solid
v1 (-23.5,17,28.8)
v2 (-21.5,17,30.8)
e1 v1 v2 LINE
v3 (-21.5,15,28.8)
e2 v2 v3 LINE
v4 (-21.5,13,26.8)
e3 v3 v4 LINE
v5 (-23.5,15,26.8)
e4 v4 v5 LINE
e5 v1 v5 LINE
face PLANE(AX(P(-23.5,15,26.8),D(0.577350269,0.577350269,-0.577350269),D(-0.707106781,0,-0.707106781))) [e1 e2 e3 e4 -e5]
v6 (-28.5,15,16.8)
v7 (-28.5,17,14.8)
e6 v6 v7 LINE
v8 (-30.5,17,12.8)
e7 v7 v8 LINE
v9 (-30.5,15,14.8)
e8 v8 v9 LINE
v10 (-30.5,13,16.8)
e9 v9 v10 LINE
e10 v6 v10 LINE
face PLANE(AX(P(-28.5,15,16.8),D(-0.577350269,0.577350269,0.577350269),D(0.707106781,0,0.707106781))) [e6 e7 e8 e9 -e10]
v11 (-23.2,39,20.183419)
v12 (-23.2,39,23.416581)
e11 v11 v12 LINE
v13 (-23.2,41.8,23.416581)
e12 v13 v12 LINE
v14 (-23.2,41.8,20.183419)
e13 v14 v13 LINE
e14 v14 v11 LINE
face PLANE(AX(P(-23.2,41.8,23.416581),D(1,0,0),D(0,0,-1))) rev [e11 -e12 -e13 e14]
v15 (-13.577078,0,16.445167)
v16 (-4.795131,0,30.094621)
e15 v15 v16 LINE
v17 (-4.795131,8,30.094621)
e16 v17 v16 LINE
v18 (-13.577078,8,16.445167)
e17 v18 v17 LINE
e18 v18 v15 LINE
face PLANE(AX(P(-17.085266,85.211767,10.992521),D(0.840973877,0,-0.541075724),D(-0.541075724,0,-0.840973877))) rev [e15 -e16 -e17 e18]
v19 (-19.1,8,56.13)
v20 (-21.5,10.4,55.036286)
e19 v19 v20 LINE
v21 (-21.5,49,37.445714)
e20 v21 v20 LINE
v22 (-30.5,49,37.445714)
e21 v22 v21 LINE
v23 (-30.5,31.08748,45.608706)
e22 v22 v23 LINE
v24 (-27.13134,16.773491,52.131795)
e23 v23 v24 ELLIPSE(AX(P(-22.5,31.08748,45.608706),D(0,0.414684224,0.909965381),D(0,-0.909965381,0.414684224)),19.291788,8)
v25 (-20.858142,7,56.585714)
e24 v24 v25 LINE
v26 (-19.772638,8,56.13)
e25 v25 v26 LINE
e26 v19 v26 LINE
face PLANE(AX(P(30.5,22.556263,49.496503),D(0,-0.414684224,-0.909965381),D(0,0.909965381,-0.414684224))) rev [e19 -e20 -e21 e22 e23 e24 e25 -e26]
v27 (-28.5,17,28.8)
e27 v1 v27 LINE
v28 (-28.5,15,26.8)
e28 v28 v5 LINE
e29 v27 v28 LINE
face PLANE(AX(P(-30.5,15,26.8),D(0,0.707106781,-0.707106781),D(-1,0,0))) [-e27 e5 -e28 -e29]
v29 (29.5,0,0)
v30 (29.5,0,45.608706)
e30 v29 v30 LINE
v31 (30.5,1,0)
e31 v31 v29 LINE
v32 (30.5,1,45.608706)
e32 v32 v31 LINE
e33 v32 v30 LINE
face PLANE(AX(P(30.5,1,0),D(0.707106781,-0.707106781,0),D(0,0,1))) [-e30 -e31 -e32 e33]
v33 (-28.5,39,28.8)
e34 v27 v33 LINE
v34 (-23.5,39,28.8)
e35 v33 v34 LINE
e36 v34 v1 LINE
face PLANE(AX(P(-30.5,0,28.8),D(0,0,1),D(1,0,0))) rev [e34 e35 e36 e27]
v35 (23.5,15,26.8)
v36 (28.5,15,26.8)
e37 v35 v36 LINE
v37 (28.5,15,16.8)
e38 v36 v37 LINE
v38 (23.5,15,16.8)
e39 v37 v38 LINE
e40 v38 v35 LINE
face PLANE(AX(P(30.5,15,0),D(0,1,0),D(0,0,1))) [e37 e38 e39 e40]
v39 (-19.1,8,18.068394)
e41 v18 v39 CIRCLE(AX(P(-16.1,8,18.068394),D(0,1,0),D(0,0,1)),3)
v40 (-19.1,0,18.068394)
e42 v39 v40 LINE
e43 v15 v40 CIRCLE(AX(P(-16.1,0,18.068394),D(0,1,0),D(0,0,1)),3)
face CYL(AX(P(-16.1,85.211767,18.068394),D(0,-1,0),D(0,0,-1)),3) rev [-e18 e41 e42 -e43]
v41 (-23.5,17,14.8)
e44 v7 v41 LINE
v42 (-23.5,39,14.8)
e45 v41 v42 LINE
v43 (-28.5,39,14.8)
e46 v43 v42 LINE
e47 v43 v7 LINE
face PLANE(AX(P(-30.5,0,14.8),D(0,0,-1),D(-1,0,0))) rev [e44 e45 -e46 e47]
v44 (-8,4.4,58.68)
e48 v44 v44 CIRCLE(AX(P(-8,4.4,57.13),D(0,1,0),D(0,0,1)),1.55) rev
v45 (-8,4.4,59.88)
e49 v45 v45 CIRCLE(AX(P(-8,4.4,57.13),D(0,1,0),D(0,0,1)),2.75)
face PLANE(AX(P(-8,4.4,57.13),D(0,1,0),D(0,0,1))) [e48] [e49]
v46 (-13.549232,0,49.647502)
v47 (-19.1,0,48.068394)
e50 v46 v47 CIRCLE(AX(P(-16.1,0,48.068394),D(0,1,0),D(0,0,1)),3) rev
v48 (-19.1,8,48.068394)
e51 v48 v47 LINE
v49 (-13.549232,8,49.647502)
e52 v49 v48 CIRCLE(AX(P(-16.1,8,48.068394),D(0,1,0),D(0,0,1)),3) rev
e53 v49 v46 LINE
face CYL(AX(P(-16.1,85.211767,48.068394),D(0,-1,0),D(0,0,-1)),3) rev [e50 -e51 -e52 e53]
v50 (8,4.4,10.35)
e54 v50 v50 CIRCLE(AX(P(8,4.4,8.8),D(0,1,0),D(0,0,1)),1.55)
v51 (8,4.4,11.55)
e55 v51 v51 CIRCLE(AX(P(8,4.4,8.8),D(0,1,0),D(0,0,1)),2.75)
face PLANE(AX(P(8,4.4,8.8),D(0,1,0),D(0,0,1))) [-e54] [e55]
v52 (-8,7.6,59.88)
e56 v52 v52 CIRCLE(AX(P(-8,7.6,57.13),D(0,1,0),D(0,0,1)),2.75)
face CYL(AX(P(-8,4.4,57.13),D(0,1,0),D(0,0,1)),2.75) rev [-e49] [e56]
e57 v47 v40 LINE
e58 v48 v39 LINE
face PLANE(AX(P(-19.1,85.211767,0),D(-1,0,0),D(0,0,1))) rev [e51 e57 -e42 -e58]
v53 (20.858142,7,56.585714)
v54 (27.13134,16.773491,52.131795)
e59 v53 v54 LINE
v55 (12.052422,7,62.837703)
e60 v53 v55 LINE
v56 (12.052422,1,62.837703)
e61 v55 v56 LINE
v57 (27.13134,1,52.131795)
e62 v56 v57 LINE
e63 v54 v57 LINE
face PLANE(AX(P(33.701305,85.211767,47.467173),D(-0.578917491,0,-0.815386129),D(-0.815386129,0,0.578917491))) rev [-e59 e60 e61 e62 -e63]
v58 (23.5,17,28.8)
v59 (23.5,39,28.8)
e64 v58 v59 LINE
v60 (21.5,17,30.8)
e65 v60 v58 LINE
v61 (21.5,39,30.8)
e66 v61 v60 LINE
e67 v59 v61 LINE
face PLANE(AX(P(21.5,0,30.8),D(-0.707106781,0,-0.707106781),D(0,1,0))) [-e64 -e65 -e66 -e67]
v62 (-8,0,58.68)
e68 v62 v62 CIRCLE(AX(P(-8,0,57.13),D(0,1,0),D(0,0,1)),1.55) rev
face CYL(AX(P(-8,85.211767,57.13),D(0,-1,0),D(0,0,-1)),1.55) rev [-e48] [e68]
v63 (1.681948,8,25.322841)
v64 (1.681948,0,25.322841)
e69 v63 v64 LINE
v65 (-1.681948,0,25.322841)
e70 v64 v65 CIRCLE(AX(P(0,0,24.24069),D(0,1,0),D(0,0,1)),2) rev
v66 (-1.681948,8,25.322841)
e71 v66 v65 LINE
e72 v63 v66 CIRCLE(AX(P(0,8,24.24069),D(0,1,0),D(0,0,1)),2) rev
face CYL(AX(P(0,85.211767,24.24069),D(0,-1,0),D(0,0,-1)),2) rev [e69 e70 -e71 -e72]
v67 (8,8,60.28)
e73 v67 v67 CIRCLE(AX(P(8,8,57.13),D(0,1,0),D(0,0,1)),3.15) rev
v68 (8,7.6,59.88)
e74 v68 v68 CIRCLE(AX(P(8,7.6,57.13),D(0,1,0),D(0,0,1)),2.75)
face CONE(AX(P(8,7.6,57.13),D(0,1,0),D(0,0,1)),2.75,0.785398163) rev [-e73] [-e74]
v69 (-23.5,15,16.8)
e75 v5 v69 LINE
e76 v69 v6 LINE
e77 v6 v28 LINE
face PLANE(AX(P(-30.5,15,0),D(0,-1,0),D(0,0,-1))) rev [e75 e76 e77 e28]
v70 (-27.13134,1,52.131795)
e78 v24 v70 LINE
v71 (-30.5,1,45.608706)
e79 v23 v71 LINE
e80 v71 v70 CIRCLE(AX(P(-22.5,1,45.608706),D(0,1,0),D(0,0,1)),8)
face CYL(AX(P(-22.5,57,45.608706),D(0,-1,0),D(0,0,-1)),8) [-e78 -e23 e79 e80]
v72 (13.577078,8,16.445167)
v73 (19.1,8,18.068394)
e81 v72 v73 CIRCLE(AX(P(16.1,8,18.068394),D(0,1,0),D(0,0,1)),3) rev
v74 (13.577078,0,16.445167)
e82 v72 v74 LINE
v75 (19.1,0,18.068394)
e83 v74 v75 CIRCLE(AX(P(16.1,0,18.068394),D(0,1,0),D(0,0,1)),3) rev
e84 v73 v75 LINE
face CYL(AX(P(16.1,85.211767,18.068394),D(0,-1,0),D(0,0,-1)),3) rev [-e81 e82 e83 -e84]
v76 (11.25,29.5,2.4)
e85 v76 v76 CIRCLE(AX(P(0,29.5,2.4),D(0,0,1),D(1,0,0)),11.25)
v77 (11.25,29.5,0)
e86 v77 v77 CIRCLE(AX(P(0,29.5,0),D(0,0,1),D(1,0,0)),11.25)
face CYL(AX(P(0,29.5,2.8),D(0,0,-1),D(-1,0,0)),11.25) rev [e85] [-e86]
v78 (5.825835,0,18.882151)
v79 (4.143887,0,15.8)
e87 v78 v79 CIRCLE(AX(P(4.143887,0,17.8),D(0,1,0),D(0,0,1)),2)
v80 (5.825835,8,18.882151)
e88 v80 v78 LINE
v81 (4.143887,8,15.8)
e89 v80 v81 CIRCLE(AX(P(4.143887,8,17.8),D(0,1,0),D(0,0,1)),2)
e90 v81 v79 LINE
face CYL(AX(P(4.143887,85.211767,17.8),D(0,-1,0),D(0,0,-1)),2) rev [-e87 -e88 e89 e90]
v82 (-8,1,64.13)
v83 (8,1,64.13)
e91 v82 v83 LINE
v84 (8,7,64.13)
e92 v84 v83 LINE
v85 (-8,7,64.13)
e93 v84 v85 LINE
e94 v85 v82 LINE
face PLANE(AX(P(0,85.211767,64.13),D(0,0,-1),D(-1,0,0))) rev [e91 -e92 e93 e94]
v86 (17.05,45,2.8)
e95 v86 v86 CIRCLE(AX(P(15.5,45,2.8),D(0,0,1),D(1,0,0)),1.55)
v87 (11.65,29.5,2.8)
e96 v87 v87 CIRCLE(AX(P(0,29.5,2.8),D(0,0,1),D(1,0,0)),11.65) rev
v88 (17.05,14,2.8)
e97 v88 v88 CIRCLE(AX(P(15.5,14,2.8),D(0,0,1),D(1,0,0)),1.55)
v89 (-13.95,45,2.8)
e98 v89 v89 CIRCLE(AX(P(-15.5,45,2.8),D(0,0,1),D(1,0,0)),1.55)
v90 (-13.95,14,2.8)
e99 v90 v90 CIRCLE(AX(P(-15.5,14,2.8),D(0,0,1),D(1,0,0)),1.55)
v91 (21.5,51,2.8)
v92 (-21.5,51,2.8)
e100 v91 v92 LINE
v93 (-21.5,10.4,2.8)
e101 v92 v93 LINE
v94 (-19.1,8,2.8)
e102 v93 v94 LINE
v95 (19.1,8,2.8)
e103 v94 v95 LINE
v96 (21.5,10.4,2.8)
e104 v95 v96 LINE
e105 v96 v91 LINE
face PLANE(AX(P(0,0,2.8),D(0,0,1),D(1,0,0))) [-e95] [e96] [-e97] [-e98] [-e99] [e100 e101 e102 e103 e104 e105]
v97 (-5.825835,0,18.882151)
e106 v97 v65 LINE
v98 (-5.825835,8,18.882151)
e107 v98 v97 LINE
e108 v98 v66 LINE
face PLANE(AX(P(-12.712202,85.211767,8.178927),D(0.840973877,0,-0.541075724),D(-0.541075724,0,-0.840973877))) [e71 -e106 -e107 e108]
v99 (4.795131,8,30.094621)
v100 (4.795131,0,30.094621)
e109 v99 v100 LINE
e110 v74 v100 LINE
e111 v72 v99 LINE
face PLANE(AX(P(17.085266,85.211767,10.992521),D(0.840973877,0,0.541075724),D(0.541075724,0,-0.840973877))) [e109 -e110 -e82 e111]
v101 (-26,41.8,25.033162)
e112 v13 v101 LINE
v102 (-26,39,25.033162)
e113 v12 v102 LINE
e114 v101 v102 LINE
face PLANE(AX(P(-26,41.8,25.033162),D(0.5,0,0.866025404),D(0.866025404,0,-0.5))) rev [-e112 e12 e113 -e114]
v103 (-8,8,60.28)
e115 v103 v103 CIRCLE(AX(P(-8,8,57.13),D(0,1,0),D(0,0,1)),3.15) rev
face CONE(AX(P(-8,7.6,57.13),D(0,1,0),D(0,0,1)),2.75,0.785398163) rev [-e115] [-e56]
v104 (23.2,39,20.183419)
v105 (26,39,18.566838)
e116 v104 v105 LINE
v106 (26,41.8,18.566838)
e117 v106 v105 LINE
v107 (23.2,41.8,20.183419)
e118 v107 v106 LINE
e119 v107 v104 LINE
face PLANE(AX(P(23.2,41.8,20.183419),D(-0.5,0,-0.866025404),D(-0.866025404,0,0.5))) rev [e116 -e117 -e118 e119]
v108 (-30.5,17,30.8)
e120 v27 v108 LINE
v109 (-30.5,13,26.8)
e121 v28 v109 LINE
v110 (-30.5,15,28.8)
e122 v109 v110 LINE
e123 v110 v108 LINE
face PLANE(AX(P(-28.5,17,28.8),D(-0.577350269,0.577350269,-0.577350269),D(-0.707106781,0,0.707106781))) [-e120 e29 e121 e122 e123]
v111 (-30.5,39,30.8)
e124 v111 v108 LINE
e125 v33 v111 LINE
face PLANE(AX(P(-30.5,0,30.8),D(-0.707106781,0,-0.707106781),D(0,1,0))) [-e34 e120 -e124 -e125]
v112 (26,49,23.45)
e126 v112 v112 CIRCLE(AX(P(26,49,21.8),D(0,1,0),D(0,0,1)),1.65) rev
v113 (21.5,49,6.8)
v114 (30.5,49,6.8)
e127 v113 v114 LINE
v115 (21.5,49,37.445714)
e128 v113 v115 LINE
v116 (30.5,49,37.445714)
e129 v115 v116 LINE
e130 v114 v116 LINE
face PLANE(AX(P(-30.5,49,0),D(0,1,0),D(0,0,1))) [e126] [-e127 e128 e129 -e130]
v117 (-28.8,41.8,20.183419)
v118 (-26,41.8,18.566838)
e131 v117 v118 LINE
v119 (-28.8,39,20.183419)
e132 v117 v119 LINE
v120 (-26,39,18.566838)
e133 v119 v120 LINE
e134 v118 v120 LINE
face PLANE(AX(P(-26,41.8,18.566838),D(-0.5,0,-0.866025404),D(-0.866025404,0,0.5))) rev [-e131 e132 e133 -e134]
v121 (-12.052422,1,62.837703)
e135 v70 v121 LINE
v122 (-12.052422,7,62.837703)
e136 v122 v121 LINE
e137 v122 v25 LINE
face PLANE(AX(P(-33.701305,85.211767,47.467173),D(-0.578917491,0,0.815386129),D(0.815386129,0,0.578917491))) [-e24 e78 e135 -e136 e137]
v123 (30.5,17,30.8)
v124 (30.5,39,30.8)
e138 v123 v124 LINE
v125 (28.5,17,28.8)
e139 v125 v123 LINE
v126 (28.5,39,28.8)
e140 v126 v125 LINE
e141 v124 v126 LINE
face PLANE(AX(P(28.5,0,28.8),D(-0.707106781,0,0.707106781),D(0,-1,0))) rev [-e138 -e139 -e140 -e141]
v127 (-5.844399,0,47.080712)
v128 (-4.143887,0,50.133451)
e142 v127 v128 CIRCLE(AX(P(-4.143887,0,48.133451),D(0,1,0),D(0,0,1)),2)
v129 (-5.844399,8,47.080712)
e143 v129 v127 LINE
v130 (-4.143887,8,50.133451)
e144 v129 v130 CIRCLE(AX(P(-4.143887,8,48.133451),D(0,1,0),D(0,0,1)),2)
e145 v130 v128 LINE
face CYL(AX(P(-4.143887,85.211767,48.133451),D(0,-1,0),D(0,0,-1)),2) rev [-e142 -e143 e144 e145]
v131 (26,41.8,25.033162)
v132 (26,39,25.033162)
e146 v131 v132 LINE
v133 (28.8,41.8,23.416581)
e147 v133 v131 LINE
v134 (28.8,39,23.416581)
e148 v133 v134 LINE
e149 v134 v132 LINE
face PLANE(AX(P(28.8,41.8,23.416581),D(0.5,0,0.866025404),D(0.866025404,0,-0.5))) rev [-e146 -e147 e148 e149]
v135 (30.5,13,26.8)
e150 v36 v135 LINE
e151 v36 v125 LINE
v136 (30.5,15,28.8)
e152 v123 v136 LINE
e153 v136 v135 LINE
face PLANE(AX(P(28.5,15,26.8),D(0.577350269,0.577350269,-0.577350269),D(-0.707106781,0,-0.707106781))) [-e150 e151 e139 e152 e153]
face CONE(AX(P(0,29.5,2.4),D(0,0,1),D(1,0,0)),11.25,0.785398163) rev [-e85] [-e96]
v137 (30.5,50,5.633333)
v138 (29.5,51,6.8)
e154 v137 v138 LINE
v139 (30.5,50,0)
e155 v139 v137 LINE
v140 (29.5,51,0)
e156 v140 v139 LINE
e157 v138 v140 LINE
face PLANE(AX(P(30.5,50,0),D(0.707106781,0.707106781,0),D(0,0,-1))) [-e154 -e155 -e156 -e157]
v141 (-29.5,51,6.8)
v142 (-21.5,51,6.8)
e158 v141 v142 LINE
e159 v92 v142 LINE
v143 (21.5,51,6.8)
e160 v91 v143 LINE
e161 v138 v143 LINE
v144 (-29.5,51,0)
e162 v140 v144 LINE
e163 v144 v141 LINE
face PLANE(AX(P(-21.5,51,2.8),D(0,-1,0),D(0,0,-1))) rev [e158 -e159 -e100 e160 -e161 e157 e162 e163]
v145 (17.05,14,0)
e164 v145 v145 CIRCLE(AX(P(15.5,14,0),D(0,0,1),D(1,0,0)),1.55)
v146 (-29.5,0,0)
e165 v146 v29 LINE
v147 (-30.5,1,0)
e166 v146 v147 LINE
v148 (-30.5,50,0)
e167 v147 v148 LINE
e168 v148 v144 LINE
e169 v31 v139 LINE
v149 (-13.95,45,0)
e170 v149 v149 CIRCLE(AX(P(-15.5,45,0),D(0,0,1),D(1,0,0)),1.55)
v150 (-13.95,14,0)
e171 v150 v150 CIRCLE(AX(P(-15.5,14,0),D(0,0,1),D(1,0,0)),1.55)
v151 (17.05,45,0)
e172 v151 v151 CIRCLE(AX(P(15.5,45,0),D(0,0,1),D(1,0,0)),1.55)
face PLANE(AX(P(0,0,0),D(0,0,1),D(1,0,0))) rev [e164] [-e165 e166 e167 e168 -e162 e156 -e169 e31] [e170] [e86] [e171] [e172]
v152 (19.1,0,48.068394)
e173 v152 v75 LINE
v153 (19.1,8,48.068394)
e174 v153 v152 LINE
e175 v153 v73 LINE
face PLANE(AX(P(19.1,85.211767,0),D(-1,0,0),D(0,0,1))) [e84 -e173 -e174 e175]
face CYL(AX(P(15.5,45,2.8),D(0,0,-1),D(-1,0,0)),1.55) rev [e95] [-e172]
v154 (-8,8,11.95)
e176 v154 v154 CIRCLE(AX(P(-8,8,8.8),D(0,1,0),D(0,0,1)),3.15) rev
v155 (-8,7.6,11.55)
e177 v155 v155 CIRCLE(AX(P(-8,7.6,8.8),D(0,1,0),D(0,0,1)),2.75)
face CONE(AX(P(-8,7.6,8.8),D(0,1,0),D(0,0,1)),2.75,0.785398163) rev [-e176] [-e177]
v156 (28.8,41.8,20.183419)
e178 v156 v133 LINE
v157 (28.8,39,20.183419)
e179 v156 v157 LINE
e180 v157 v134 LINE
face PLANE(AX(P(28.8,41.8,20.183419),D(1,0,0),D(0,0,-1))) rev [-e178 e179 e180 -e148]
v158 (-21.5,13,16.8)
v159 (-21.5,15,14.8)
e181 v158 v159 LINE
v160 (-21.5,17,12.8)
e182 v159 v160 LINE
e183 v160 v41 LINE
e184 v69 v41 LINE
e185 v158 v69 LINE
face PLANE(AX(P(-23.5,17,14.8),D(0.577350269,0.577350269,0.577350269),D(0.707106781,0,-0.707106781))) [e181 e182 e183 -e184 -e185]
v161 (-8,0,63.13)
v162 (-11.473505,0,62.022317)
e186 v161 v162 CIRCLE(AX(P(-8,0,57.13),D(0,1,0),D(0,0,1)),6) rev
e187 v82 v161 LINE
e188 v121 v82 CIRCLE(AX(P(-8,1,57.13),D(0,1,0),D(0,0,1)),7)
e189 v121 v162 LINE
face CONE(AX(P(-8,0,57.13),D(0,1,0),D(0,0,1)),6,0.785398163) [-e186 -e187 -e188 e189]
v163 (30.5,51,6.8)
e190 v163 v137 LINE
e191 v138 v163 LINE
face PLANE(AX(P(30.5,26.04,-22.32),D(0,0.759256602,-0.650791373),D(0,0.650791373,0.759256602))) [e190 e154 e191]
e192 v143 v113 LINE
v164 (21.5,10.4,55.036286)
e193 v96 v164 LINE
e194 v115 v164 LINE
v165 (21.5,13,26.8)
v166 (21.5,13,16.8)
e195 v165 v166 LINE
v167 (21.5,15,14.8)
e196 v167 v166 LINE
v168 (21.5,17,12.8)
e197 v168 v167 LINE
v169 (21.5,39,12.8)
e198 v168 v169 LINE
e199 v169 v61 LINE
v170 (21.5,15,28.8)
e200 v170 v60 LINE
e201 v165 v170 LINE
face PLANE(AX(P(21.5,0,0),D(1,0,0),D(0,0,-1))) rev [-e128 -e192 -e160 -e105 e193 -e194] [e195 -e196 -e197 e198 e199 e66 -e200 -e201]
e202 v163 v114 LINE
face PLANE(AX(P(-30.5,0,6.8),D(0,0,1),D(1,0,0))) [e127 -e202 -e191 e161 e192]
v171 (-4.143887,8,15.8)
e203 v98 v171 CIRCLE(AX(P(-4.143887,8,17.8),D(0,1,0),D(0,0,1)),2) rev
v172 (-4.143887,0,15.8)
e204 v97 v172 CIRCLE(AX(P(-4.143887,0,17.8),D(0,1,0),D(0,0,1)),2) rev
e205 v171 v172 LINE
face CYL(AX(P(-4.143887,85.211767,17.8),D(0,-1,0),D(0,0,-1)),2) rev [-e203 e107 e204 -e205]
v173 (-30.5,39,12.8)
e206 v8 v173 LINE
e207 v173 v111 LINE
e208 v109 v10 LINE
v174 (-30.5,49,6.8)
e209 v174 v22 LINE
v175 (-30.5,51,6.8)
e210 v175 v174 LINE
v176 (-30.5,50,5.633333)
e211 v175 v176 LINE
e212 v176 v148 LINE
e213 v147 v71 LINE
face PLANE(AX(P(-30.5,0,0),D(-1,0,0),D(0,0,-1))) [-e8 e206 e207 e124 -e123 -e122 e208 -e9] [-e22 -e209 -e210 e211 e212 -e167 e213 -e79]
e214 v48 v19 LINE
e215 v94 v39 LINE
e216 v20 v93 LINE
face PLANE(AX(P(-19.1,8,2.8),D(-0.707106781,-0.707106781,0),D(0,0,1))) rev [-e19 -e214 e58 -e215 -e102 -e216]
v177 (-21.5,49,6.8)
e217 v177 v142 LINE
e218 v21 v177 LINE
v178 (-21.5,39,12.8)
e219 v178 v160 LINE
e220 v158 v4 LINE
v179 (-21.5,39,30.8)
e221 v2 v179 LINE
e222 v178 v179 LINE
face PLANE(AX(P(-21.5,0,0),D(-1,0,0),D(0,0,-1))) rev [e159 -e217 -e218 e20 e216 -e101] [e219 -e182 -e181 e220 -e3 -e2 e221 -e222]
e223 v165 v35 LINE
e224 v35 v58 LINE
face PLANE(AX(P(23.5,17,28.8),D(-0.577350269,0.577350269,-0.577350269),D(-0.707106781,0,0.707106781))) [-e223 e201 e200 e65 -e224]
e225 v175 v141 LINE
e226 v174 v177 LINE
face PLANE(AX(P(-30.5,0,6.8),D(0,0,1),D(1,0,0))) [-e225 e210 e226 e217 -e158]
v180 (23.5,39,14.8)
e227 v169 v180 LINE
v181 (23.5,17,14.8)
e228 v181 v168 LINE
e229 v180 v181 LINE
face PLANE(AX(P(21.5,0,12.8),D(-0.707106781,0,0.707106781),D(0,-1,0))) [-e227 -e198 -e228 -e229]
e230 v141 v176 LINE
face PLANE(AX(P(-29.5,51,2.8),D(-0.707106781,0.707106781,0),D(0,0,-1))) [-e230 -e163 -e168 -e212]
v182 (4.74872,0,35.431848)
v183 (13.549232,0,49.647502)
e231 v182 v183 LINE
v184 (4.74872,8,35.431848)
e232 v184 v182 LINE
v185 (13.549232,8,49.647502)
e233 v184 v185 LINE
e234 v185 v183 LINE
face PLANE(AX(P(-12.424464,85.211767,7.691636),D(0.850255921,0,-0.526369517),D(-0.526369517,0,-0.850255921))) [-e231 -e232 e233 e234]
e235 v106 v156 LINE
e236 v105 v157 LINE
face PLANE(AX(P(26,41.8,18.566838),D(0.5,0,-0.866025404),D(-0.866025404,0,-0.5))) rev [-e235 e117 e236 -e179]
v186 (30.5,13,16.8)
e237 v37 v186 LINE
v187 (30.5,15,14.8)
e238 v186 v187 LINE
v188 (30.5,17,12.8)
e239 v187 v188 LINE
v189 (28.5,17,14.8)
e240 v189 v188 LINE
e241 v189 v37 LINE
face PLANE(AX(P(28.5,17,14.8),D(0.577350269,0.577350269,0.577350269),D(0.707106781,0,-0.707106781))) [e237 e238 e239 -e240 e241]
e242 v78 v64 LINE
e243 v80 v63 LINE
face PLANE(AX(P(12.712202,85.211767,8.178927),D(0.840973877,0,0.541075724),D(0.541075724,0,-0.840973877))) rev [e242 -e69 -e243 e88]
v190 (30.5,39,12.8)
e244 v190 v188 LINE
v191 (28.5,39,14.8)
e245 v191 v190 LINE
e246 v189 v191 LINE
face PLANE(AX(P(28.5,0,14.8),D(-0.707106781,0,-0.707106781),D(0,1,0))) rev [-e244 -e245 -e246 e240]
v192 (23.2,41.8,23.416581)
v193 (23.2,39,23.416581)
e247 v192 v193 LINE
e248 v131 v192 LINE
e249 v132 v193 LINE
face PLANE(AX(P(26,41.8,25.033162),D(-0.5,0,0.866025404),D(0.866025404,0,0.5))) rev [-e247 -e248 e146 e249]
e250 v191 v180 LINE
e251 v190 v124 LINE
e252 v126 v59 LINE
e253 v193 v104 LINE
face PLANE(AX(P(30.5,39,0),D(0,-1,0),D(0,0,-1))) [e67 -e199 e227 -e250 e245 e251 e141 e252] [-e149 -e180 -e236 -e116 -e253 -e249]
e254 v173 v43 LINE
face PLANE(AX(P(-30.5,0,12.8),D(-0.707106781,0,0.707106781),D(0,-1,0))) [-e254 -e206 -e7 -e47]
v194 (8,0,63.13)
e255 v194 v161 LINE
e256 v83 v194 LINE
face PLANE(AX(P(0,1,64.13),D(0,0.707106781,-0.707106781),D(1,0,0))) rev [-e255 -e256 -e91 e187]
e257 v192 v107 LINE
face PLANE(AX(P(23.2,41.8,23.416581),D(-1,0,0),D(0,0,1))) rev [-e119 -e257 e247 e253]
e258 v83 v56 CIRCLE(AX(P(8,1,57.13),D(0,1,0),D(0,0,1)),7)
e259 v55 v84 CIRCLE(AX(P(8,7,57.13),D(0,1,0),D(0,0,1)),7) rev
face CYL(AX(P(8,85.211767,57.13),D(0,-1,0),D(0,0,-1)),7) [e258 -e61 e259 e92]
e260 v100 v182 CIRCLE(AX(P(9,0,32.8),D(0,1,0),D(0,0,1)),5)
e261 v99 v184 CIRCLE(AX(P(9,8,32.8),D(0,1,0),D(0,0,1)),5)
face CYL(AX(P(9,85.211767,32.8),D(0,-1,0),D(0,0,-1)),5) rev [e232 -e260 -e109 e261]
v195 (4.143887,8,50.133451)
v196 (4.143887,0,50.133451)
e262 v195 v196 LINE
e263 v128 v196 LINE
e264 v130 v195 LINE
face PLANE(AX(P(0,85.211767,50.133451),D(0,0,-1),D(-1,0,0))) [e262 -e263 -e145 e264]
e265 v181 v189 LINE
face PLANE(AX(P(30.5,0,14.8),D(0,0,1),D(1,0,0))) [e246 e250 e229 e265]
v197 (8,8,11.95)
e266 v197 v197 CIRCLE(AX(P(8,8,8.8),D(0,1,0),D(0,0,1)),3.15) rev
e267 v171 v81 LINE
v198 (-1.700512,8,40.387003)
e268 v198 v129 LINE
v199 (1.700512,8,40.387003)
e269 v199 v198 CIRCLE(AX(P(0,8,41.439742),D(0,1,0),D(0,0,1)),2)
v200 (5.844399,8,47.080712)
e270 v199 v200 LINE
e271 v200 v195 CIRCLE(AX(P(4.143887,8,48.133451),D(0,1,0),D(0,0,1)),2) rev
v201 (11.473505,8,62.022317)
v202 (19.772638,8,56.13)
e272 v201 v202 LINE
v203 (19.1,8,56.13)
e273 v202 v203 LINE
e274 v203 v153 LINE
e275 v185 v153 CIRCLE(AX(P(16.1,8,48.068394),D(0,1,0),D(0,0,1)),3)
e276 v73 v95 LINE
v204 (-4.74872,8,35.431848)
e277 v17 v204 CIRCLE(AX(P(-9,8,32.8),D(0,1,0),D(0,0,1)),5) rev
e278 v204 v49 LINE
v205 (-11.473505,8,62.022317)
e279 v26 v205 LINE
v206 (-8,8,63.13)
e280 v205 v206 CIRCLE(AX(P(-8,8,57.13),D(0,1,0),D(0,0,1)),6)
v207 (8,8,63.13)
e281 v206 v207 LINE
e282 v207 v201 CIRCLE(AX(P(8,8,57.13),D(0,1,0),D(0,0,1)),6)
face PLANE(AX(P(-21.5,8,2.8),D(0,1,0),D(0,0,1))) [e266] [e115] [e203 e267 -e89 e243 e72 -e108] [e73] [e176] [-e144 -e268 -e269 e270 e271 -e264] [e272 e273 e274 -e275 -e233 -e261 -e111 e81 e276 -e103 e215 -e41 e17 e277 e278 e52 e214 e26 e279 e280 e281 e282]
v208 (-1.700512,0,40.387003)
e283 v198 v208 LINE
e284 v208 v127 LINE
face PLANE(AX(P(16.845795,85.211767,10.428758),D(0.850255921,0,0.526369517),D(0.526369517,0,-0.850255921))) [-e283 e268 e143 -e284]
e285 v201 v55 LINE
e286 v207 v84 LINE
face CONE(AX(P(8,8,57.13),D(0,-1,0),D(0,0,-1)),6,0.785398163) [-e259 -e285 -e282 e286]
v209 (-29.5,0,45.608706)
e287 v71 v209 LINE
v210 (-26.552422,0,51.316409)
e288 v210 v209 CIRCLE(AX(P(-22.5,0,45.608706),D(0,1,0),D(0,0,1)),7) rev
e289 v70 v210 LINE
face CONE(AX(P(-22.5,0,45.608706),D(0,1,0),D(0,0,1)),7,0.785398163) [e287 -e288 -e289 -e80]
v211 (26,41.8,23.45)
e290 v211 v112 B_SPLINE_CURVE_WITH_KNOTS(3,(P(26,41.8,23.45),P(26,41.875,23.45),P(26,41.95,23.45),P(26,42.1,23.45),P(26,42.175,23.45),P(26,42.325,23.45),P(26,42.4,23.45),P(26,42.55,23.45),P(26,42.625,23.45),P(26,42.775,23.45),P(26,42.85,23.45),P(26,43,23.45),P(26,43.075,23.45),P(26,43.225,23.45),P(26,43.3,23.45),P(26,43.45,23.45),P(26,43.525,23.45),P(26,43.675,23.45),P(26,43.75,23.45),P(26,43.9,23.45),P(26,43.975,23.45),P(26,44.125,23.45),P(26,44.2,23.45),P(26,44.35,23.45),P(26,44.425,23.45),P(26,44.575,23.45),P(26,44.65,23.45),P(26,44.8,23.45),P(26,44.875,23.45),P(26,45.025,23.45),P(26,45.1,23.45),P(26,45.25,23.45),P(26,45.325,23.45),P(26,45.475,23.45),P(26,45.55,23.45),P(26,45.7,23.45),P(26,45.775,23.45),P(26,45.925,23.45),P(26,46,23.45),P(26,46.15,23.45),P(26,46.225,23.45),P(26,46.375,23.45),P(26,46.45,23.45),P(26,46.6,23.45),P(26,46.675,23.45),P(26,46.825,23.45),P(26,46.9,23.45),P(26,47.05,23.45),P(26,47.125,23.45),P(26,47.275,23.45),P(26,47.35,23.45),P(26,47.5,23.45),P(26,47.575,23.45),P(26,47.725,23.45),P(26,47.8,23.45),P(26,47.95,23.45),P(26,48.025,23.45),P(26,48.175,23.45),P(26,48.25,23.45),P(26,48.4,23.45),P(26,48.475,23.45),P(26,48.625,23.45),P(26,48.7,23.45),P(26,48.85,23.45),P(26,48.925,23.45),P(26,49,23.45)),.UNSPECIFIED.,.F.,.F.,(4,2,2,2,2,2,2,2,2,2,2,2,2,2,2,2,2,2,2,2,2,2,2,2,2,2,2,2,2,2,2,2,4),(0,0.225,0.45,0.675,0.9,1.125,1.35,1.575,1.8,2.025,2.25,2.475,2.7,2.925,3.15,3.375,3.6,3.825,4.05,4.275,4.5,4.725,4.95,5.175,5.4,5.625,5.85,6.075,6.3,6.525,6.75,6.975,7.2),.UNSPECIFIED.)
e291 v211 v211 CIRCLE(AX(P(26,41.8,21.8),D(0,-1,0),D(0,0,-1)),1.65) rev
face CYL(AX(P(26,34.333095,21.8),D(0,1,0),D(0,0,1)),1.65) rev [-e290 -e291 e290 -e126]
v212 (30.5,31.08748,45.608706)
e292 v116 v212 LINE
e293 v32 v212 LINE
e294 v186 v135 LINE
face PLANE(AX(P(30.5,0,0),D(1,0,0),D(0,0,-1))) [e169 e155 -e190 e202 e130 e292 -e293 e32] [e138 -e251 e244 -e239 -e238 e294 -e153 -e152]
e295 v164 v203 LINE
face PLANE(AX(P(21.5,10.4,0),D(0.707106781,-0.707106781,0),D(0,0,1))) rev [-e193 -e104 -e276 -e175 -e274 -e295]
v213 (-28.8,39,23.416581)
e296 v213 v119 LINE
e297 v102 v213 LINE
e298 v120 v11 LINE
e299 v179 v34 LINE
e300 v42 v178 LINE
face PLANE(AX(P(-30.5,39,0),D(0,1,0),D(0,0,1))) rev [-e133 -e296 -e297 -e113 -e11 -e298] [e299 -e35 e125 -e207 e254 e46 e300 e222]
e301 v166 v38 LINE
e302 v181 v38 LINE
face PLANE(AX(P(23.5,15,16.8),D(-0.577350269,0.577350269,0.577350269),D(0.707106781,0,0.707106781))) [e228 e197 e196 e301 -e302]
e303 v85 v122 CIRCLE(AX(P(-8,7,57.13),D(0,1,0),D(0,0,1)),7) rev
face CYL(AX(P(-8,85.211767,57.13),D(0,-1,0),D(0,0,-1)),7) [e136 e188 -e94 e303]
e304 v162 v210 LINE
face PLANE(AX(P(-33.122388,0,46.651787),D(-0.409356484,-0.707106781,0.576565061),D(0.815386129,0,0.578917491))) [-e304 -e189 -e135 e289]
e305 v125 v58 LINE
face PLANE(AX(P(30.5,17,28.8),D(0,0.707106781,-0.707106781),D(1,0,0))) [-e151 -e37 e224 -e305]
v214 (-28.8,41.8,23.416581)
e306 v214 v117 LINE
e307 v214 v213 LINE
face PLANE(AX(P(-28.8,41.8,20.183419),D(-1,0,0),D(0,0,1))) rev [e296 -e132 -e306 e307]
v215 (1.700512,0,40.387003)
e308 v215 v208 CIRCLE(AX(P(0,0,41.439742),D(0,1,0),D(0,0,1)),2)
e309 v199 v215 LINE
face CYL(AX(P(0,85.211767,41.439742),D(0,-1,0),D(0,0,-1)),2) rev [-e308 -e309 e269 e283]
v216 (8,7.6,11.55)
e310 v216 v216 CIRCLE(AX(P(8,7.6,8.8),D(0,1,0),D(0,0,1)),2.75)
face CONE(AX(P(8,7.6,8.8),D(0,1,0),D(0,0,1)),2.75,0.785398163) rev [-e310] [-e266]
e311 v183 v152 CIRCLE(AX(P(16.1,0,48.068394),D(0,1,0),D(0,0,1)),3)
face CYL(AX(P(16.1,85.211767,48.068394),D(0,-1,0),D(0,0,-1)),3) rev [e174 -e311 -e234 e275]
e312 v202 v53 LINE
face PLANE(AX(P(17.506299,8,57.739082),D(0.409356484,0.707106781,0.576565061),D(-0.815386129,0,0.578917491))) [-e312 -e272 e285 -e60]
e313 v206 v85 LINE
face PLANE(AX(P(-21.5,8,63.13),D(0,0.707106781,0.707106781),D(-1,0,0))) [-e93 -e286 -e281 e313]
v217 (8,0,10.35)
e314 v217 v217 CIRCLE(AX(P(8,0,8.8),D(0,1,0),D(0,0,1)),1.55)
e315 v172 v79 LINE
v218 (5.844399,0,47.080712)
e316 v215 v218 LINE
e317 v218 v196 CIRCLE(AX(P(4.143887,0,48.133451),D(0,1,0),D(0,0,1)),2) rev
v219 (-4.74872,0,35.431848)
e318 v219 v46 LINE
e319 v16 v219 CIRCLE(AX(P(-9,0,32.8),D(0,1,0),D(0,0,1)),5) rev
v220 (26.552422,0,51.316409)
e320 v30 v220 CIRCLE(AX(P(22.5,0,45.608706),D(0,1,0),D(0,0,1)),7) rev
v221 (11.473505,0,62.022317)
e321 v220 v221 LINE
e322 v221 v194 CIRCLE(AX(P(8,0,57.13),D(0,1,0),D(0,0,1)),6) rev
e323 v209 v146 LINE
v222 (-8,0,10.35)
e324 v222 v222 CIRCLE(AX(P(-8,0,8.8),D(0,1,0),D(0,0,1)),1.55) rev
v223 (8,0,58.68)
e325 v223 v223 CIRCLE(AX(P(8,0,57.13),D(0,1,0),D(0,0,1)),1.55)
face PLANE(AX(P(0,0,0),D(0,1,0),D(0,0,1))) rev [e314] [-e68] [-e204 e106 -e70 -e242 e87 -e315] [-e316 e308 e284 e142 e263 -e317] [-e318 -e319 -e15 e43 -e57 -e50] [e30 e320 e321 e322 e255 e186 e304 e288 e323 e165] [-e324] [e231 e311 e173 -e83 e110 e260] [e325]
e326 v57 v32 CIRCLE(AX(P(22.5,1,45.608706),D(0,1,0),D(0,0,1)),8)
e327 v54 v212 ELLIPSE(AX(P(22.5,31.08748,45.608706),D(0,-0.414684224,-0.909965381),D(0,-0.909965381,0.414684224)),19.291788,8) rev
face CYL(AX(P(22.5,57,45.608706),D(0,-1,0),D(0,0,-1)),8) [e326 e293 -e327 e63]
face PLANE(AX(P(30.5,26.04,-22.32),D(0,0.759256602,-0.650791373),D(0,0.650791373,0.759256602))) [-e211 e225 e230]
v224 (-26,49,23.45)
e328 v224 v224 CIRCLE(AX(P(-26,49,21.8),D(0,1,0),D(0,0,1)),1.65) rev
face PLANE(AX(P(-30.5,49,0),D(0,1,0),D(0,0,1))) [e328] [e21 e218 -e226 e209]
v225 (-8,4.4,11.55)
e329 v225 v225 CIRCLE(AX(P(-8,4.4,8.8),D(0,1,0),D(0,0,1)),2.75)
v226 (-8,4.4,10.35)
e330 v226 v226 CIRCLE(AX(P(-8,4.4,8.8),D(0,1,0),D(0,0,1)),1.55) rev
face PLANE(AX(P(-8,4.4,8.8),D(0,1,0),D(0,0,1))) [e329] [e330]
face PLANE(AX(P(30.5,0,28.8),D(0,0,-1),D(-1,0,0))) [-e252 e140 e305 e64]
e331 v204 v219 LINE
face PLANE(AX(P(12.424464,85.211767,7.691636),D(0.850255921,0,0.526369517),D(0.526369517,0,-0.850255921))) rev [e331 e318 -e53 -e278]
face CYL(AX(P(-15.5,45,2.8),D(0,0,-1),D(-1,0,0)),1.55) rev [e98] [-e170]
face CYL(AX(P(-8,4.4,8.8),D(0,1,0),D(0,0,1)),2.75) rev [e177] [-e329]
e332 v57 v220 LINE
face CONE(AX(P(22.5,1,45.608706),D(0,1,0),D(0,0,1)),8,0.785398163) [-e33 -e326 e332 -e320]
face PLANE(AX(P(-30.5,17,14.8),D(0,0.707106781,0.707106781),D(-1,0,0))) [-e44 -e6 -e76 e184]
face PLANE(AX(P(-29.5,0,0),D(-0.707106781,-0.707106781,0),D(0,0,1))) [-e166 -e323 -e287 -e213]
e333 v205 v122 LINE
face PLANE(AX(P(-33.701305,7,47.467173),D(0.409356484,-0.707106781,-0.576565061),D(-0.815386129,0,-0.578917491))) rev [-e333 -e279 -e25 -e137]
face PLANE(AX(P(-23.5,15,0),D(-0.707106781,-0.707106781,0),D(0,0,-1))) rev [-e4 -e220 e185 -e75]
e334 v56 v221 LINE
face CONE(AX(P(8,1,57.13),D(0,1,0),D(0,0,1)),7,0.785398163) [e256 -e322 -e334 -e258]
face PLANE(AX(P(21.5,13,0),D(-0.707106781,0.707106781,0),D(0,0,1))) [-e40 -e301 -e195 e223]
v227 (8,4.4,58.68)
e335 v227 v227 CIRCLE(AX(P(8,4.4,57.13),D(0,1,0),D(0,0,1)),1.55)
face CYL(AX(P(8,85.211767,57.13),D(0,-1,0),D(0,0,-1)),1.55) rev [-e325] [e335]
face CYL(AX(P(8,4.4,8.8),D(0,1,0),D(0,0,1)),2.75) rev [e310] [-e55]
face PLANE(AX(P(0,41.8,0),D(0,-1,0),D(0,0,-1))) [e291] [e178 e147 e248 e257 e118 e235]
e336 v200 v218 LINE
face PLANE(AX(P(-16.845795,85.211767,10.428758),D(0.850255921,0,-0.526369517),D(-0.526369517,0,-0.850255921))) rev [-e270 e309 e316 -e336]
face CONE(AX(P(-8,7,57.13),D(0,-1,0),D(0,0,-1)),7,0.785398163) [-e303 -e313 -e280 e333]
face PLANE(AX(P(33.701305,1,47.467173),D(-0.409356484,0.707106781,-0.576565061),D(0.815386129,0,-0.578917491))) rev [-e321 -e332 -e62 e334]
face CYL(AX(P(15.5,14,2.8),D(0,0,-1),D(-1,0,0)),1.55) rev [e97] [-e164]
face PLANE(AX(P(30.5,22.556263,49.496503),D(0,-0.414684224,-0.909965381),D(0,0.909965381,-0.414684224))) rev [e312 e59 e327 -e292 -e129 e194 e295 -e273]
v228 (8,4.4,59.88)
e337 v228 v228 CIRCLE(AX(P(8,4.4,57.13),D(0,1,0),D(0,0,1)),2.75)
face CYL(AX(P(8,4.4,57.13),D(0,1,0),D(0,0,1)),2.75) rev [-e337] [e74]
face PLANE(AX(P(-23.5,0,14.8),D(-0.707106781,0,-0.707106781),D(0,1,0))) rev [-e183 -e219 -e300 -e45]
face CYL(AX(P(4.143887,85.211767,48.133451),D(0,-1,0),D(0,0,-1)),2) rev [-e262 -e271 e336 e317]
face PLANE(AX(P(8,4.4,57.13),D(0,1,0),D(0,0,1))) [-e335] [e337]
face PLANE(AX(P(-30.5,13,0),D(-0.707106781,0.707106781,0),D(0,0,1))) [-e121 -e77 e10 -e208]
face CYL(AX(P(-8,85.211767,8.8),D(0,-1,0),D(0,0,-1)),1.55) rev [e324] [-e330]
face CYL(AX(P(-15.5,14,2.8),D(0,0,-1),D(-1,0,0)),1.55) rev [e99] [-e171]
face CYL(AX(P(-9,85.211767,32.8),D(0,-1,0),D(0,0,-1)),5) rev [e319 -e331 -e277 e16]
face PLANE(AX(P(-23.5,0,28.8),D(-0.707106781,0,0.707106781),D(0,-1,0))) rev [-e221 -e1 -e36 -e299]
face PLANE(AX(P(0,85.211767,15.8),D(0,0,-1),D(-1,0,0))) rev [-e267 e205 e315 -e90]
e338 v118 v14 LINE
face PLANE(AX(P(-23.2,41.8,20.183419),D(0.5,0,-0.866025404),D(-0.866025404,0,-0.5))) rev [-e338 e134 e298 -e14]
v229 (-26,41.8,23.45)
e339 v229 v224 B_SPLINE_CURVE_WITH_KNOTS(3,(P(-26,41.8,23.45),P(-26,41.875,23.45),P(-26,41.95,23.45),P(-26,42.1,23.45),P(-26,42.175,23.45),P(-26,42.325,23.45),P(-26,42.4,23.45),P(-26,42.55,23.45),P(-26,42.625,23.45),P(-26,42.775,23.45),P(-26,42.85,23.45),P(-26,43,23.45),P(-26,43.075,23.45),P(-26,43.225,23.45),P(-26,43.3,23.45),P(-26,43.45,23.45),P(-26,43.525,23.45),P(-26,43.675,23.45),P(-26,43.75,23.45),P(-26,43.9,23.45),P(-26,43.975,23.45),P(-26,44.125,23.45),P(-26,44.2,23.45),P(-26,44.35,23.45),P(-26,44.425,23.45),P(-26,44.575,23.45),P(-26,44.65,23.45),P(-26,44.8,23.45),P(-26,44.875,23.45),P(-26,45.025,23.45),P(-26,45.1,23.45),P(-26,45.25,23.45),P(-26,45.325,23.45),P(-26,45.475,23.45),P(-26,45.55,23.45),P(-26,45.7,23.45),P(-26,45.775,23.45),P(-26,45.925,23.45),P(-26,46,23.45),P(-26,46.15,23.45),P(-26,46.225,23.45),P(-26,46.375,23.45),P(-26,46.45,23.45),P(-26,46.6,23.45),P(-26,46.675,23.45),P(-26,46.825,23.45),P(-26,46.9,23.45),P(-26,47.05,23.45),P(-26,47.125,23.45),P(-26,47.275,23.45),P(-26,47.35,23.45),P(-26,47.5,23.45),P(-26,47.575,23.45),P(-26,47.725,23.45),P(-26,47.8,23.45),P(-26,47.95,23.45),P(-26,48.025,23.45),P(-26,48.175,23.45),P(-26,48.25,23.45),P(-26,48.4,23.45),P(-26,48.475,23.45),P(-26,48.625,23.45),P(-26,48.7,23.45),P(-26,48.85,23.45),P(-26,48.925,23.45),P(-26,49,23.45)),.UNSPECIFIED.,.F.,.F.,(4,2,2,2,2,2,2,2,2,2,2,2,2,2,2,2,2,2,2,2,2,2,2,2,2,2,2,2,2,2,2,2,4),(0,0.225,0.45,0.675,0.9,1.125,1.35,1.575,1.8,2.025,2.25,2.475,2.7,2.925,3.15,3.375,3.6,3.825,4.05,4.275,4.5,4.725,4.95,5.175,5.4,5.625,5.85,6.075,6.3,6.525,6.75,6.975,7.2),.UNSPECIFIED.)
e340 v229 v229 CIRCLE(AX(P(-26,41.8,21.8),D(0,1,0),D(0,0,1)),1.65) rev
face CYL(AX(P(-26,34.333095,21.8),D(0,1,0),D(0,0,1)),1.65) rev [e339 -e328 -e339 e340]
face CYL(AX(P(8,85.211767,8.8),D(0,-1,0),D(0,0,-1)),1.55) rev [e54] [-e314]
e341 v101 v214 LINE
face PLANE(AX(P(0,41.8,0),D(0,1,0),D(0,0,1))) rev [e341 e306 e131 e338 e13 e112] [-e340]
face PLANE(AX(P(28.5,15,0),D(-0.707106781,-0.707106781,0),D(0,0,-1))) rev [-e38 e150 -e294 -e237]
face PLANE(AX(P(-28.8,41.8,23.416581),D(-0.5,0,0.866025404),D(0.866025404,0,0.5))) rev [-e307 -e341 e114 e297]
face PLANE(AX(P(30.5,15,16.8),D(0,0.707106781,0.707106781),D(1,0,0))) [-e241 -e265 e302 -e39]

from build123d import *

# Parameters (mm, degrees)
SKETCH1_W               = 42.99999999999999
SKETCH1_H               = 43.00000000000001
SKETCH1_R               = 11.250000000000002
SKETCH1_R_2             = 1.5500000000000034
SKETCH1_R_3             = 1.5500000000000018
SKETCH1_R_4             = 1.5499999999999992
SKETCH1_R_5             = 1.5500000000000012
BOSS_EXTRUDE1_DEPTH     = 2.8
SKETCH2_R               = 1.5499999999999992
SKETCH2_R_2             = 1.5500000000000005
SKETCH2_R_3             = 1.5500000000000034
SKETCH2_R_4             = 1.5500000000000018
BOSS_EXTRUDE2_DEPTH     = 8
SKETCH3_R               = 2.75
SKETCH3_R_2             = 2.749999999999998
SKETCH3_R_3             = 2.7500000000000044
SKETCH3_R_4             = 2.7500000000000036
CUT_EXTRUDE1_DEPTH      = 3.6
SKETCH4_W               = 13.999999999999996
SKETCH4_H               = 24
BOSS_EXTRUDE3_DEPTH     = 9
CUT_EXTRUDE3_DEPTH      = 92.05990830217213
CHAMFER1_SIZE           = 2.4
BOSS_EXTRUDE4_START     = -21.5
BOSS_EXTRUDE4_DEPTH     = 43
SKETCH5_R               = 1.6499999999999986
SKETCH5_R_2             = 1.6500000000000061
CUT_EXTRUDE2_DEPTH      = 18
CUT_EXTRUDE4_DEPTH      = 2.8
CHAMFER2_SIZE           = 1
CHAMFER3_SIZE           = 1
FILLET1_R               = 2
CHAMFER4_SIZE           = 2
CHAMFER5_SIZE           = 0.4
CHAMFER6_SIZE           = 0.4
CUT_EXTRUDE5_DEPTH      = 92.05990830217213
CUT_EXTRUDE5_DEPTH_BACK = 92.05990830217213


# Read off the part's stored shape, not the designer's step: Mirror1
with BuildPart() as part:
    # Sketch1 → Boss-Extrude1 (new body)
    with BuildSketch(Plane.XY):
        with Locations((0, 29.500000000000004)):
            Rectangle(SKETCH1_W, SKETCH1_H)
        with Locations((0, 29.5)):
            Circle(SKETCH1_R, mode=Mode.SUBTRACT)
        with Locations((-15.5, 45)):
            Circle(SKETCH1_R_2, mode=Mode.SUBTRACT)
        with Locations((15.5, 45)):
            Circle(SKETCH1_R_3, mode=Mode.SUBTRACT)
        with Locations((-15.5, 14.000000000000005)):
            Circle(SKETCH1_R_4, mode=Mode.SUBTRACT)
        with Locations((15.5, 14.000000000000005)):
            Circle(SKETCH1_R_5, mode=Mode.SUBTRACT)
    extrude(amount=BOSS_EXTRUDE1_DEPTH)

    # Sketch2 → Boss-Extrude2 (add)
    with BuildSketch(Plane(origin=(0, 0, 0), x_dir=(1, 0, 0), z_dir=(0, 1, 0))):
        with BuildLine():
            Line((-21.499999999999996, 0), (21.499999999999996, 0))
            Line((21.499999999999996, 0), (21.5, -56.13000000000001))
            Line((21.5, -56.13000000000001), (12.052422437019597, -62.83770289976113))
            ThreePointArc((12.052422437019597, -62.83770289976113), (10.126743955166411, -63.79910489864743), (8.000000000000245, -64.12999999999994))
            Line((8.000000000000245, -64.12999999999994), (-7.999999999999807, -64.13))
            ThreePointArc((-7.999999999999807, -64.13), (-10.126743955165974, -63.7991048986475), (-12.052422437019167, -62.83770289976122))
            Line((-12.052422437019167, -62.83770289976122), (-21.49999999999961, -56.13000000000015))
            Line((-21.49999999999961, -56.13000000000015), (-21.499999999999996, 0))
        make_face()
        with Locations(Location((8.00000000000003, -8.800000000000002, 0), (0, 0, 270))):
            Circle(SKETCH2_R, mode=Mode.SUBTRACT)
        with Locations(Location((-7.999999999999971, -8.800000000000054, 0), (0, 0, 270))):
            Circle(SKETCH2_R_2, mode=Mode.SUBTRACT)
        with Locations(Location((-7.999999999999804, -57.13000000000005, 0), (0, 0, 270))):
            Circle(SKETCH2_R_3, mode=Mode.SUBTRACT)
        with Locations(Location((8.000000000000195, -57.13, 0), (0, 0, 270))):
            Circle(SKETCH2_R_4, mode=Mode.SUBTRACT)
        with BuildLine():
            Line((13.57707837001736, -16.445166557918895), (4.795130616695724, -30.094621381516244))
            ThreePointArc((4.795130616695724, -30.094621381516244), (4.000189021604087, -32.75652379604577), (4.748720395176192, -35.43184758707804))
            Line((4.748720395176192, -35.43184758707804), (13.549232237105649, -49.64750228125598))
            ThreePointArc((13.549232237105649, -49.64750228125598), (16.92088266863083, -50.95390090181981), (19.099999999999994, -48.06839372900919))
            Line((19.099999999999994, -48.06839372900919), (19.099999999999994, -18.06839372900918))
            ThreePointArc((19.099999999999994, -18.06839372900918), (16.945941815390423, -15.190133413302142), (13.57707837001736, -16.445166557918895))
        make_face(mode=Mode.SUBTRACT)
        with BuildLine():
            Line((5.825834789666343, -18.882151447393497), (1.681947753321832, -25.32284097156898))
            ThreePointArc((1.681947753321832, -25.32284097156898), (8.95e-14, -26.24068952417545), (-1.6819477533216585, -25.32284097156899))
            Line((-1.6819477533216585, -25.32284097156899), (-5.825834789666213, -18.88215144739354))
            ThreePointArc((-5.825834789666213, -18.88215144739354), (-5.899492757283408, -16.84195587126352), (-4.14388703634448, -15.800000000000026))
            Line((-4.14388703634448, -15.800000000000026), (4.143887036344589, -15.799999999999999))
            ThreePointArc((4.143887036344589, -15.799999999999999), (5.899492757283525, -16.841955871263476), (5.825834789666343, -18.882151447393497))
        make_face(mode=Mode.SUBTRACT)
        with BuildLine():
            Line((1.7005118419297098, -40.38700274513657), (5.844398878274272, -47.080711958695154))
            ThreePointArc((5.844398878274272, -47.080711958695154), (5.891095963414161, -49.10672431853265), (4.143887036344701, -50.13345099352635))
            Line((4.143887036344701, -50.13345099352635), (-4.14388703634435, -50.13345099352636))
            ThreePointArc((-4.14388703634435, -50.13345099352636), (-5.891095963413801, -49.10672431853265), (-5.844398878273922, -47.08071195869517))
            Line((-5.844398878273922, -47.08071195869517), (-1.7005118419294287, -40.387002745136584))
            ThreePointArc((-1.7005118419294287, -40.387002745136584), (1.3517e-13, -39.43974177996776), (1.7005118419297098, -40.38700274513657))
        make_face(mode=Mode.SUBTRACT)
        with BuildLine():
            Line((-4.748720395175949, -35.431847587078074), (-13.54923223710531, -49.64750228125607))
            ThreePointArc((-13.54923223710531, -49.64750228125607), (-16.920882668630473, -50.953900901819914), (-19.099999999999664, -48.06839372900932))
            Line((-19.099999999999664, -48.06839372900932), (-19.09999999999987, -18.068393729009312))
            ThreePointArc((-19.09999999999987, -18.068393729009312), (-16.945941815390317, -15.190133413302267), (-13.577078370017249, -16.445166557918988))
            Line((-13.577078370017249, -16.445166557918988), (-4.795130616695517, -30.094621381516276))
            ThreePointArc((-4.795130616695517, -30.094621381516276), (-4.000189021603861, -32.7565237960458), (-4.748720395175949, -35.431847587078074))
        make_face(mode=Mode.SUBTRACT)
    extrude(amount=BOSS_EXTRUDE2_DEPTH)

    # Sketch3 → Cut-Extrude1 (cut)
    with BuildSketch(Plane(origin=(0, 8, 0), x_dir=(1, 0, 0), z_dir=(0, 1, 0))):
        with Locations(Location((-7.999999999999971, -8.800000000000054, 0), (0, 0, 270))):
            Circle(SKETCH3_R)
        with Locations(Location((8.00000000000003, -8.800000000000002, 0), (0, 0, 270))):
            Circle(SKETCH3_R_2)
        with Locations(Location((-7.999999999999804, -57.13000000000005, 0), (0, 0, 270))):
            Circle(SKETCH3_R_3)
        with Locations(Location((8.000000000000195, -57.13, 0), (0, 0, 270))):
            Circle(SKETCH3_R_4)
    extrude(amount=-CUT_EXTRUDE1_DEPTH, mode=Mode.SUBTRACT)

    # Sketch4 → Boss-Extrude3 (add)
    # profile 1 of 2: a face of its own
    with BuildSketch(Plane(origin=(21.499999999999996, 0, 0), x_dir=(0, 0, -1), z_dir=(1, 0, 0))):
        Polygon((-2.8, 8), (-2.8, 51), (-6.800000000000001, 51), (-13.799999999999999, 56.99999999999999), (-33.8, 56.99999999999999), (-56.13000000000001, 8.000000000000007), align=None)
        with Locations((-21.79999999999999, 26.999999999999993)):
            Rectangle(SKETCH4_W, SKETCH4_H, mode=Mode.SUBTRACT)
    # profile 2 of 2: a face of its own
    with BuildSketch(Plane(origin=(21.499999999999996, 0, 0), x_dir=(0, 0, -1), z_dir=(1, 0, 0))):
        Polygon((0, 51), (-2.8, 51), (-2.8, 8), (-56.13000000000001, 8.000000000000007), (-56.13000000000001, 0), (0, 0), align=None)
    extrude(amount=BOSS_EXTRUDE3_DEPTH)

    # Sketch6 → Cut-Extrude3 (cut, through all)
    with BuildSketch(Plane.XZ):
        with BuildLine():
            Line((30.499999999999993, 56.13000000000001), (21.5, 56.13000000000001))
            Line((21.5, 56.13000000000001), (27.13133992802216, 52.13179464916523))
            ThreePointArc((27.13133992802216, 52.13179464916523), (29.608119280941235, 49.27948759313254), (30.499999999999993, 45.60870562086677))
            Line((30.499999999999993, 45.60870562086677), (30.499999999999993, 56.13000000000001))
        make_face()
    extrude(amount=-CUT_EXTRUDE3_DEPTH, mode=Mode.SUBTRACT)

    # Chamfer1
    # the kernel refuses this chamfer: 2.4 mm, written as the material it adds along each edge
    with BuildSketch(Plane(origin=(21.499999999999996, 8, 2.8), x_dir=(-0.9996219169112968, -0.027495876610586303, 0), z_dir=(6e-17, 0, 1))) as chamfer1_piece_1_section:
        Polygon((CHAMFER1_SIZE * 0.999621916911, -CHAMFER1_SIZE * 0.0274958766106), (-CHAMFER1_SIZE * 0.0274958766106, -CHAMFER1_SIZE * 0.999621916911), (0, 0), align=None)
    chamfer1_piece_1 = extrude(amount=59.502039171118206, mode=Mode.PRIVATE)
    chamfer1_piece_1 = split(chamfer1_piece_1, bisect_by=Plane(origin=(20.6986233607906, 18.790690338484964, 51.212528260033295), z_dir=(0, -0.4146842236388121, -0.9099653810256056)), keep=Keep.TOP, mode=Mode.PRIVATE)
    add(chamfer1_piece_1)

    # Mirror1: part across plane


with BuildPart() as part_1:
    add(part.part)
    add(part.part.mirror(Plane(origin=(0, 0, 0), x_dir=(0, 0, 1), z_dir=(1, 0, 0))))

    # Sketch7 → Boss-Extrude4 (add)
    with BuildSketch(Plane(origin=(0, 0, 0), x_dir=(0, 0, -1), z_dir=(1, 0, 0)).offset(BOSS_EXTRUDE4_START)):
        Polygon((-36.5342857142857, 50.99999999999999), (-6.800000000000001, 51), (-13.799999999999999, 56.99999999999999), (-33.8, 56.99999999999999), align=None)
    extrude(amount=BOSS_EXTRUDE4_DEPTH)

    # Sketch5 → Cut-Extrude2 (cut)
    with BuildSketch(Plane(origin=(0, 56.99999999999999, 0), x_dir=(1, 0, 0), z_dir=(0, 1, 0))):
        with Locations(Location((25.999999999999996, -21.79999999999998, 0), (0, 0, 270))):
            Circle(SKETCH5_R)
        with Locations(Location((-25.999999999999996, -21.79999999999998, 0), (0, 0, 270))):
            Circle(SKETCH5_R_2)
    extrude(amount=-CUT_EXTRUDE2_DEPTH, mode=Mode.SUBTRACT)

    # Sketch9 → Cut-Extrude4 (cut)
    with BuildSketch(Plane.XZ.offset(-38.99999999999999)):
        Polygon((25.999999999999996, 18.566838492538075), (28.8, 20.183419246269047), (28.79999999999999, 23.416580753730948), (25.999999999999993, 25.03316150746189), (23.19999999999999, 23.416580753730923), (23.2, 20.183419246269043), align=None)
        Polygon((-25.999999999999996, 18.566838492538093), (-28.8, 20.183419246269047), (-28.8, 23.416580753730944), (-25.999999999999993, 25.033161507461898), (-23.2, 23.416580753730948), (-23.2, 20.183419246269043), align=None)
    extrude(amount=-CUT_EXTRUDE4_DEPTH, mode=Mode.SUBTRACT)

    # Chamfer2
    chamfer2_edges = [part_1.edges().sort_by_distance(p)[0] for p in [
        (30.499999999999996, 0, 22.804352810433386),
        (29.608119280941235, 0, 49.27948759313254),
        (-30.499999999999996, 0, 22.804352810433386),
        (-29.608119280941235, 0, 49.27948759313254),
        (-10.12674395516598, 8, 63.7991048986475),
        (2.1849e-13, 0, 64.12999999999997),
        (10.126743955166415, 0, 63.79910489864743),
        (19.591881182520773, 0, 57.4847487744632),
        (-16.77621121850939, 8, 59.48385144988068),
        (-10.12674395516598, 0, 63.7991048986475),
        (-19.591881182520773, 0, 57.4847487744632),
        (2.1849e-13, 8, 64.12999999999997),
        (10.126743955166415, 8, 63.79910489864743),
        (16.7762112185098, 8, 59.483851449880575),
    ]]
    chamfer(chamfer2_edges, length=CHAMFER2_SIZE)

    # Chamfer3
    chamfer3_edges = [part_1.edges().sort_by_distance(p)[0] for p in [
        (30.499999999999996, 51, 3.4000000000000004),
        (-30.499999999999996, 51, 3.4000000000000004),
    ]]
    chamfer(chamfer3_edges, length=CHAMFER3_SIZE)

    # Fillet1
    fillet1_edges = [part_1.edges().sort_by_distance(p)[0] for p in [
        (0, 56.99999999999999, 33.8),
        (0, 56.99999999999999, 13.799999999999999),
    ]]
    fillet(fillet1_edges, radius=FILLET1_R)

    # Chamfer4
    chamfer4_edges = [part_1.edges().sort_by_distance(p)[0] for p in [
        (30.499999999999996, 26.999999999999993, 14.799999999999994),
        (30.499999999999996, 14.999999999999993, 21.799999999999994),
        (25.999999999999996, 14.999999999999993, 14.799999999999994),
        (30.499999999999996, 26.999999999999993, 28.799999999999994),
        (25.999999999999996, 14.999999999999993, 28.799999999999994),
        (21.499999999999996, 26.999999999999993, 28.799999999999994),
        (21.499999999999996, 14.999999999999993, 21.799999999999994),
        (21.499999999999996, 26.999999999999993, 14.799999999999994),
        (-21.499999999999996, 26.999999999999993, 28.799999999999994),
        (-21.499999999999996, 14.999999999999993, 21.799999999999994),
        (-25.999999999999996, 14.999999999999993, 28.799999999999994),
        (-21.499999999999996, 26.999999999999993, 14.799999999999994),
        (-25.999999999999996, 14.999999999999993, 14.799999999999994),
        (-30.499999999999996, 26.999999999999993, 28.799999999999994),
        (-30.499999999999996, 14.999999999999993, 21.799999999999994),
        (-30.499999999999996, 26.999999999999993, 14.799999999999994),
    ]]
    chamfer(chamfer4_edges, length=CHAMFER4_SIZE)

    # Chamfer5
    chamfer5_edges = [part_1.edges().sort_by_distance(p)[0] for p in [
        (-11.25, 29.500000000000004, 2.8),
    ]]
    chamfer(chamfer5_edges, length=CHAMFER5_SIZE)

    # Chamfer6
    chamfer6_edges = [part_1.edges().sort_by_distance(p)[0] for p in [
        (8.00000000000003, 8, 6.050000000000004),
        (-7.999999999999802, 8, 54.380000000000045),
        (8.000000000000195, 8, 54.379999999999995),
        (-7.999999999999969, 8, 6.050000000000054),
    ]]
    chamfer(chamfer6_edges, length=CHAMFER6_SIZE)

    # Sketch8 → Cut-Extrude5 (cut, two sides: drawn at the far end of the back side and taken through both)
    with BuildSketch(Plane(origin=(0, 0, 0), x_dir=(0, 0, -1), z_dir=(1, 0, 0)).offset(-CUT_EXTRUDE5_DEPTH_BACK)):
        Polygon((-6.800000000000001, 51), (-200, 50.99999999999998), (-200, 48.99999999999997), (-6.800000000000001, 48.99999999999999), align=None)
        Polygon((-200, 50.99999999999998), (-6.800000000000001, 51), (0, 51), (0, 200), (-200, 199.99999999999997), align=None)
    extrude(amount=CUT_EXTRUDE5_DEPTH + CUT_EXTRUDE5_DEPTH_BACK, mode=Mode.SUBTRACT)


solid = part_1.part
